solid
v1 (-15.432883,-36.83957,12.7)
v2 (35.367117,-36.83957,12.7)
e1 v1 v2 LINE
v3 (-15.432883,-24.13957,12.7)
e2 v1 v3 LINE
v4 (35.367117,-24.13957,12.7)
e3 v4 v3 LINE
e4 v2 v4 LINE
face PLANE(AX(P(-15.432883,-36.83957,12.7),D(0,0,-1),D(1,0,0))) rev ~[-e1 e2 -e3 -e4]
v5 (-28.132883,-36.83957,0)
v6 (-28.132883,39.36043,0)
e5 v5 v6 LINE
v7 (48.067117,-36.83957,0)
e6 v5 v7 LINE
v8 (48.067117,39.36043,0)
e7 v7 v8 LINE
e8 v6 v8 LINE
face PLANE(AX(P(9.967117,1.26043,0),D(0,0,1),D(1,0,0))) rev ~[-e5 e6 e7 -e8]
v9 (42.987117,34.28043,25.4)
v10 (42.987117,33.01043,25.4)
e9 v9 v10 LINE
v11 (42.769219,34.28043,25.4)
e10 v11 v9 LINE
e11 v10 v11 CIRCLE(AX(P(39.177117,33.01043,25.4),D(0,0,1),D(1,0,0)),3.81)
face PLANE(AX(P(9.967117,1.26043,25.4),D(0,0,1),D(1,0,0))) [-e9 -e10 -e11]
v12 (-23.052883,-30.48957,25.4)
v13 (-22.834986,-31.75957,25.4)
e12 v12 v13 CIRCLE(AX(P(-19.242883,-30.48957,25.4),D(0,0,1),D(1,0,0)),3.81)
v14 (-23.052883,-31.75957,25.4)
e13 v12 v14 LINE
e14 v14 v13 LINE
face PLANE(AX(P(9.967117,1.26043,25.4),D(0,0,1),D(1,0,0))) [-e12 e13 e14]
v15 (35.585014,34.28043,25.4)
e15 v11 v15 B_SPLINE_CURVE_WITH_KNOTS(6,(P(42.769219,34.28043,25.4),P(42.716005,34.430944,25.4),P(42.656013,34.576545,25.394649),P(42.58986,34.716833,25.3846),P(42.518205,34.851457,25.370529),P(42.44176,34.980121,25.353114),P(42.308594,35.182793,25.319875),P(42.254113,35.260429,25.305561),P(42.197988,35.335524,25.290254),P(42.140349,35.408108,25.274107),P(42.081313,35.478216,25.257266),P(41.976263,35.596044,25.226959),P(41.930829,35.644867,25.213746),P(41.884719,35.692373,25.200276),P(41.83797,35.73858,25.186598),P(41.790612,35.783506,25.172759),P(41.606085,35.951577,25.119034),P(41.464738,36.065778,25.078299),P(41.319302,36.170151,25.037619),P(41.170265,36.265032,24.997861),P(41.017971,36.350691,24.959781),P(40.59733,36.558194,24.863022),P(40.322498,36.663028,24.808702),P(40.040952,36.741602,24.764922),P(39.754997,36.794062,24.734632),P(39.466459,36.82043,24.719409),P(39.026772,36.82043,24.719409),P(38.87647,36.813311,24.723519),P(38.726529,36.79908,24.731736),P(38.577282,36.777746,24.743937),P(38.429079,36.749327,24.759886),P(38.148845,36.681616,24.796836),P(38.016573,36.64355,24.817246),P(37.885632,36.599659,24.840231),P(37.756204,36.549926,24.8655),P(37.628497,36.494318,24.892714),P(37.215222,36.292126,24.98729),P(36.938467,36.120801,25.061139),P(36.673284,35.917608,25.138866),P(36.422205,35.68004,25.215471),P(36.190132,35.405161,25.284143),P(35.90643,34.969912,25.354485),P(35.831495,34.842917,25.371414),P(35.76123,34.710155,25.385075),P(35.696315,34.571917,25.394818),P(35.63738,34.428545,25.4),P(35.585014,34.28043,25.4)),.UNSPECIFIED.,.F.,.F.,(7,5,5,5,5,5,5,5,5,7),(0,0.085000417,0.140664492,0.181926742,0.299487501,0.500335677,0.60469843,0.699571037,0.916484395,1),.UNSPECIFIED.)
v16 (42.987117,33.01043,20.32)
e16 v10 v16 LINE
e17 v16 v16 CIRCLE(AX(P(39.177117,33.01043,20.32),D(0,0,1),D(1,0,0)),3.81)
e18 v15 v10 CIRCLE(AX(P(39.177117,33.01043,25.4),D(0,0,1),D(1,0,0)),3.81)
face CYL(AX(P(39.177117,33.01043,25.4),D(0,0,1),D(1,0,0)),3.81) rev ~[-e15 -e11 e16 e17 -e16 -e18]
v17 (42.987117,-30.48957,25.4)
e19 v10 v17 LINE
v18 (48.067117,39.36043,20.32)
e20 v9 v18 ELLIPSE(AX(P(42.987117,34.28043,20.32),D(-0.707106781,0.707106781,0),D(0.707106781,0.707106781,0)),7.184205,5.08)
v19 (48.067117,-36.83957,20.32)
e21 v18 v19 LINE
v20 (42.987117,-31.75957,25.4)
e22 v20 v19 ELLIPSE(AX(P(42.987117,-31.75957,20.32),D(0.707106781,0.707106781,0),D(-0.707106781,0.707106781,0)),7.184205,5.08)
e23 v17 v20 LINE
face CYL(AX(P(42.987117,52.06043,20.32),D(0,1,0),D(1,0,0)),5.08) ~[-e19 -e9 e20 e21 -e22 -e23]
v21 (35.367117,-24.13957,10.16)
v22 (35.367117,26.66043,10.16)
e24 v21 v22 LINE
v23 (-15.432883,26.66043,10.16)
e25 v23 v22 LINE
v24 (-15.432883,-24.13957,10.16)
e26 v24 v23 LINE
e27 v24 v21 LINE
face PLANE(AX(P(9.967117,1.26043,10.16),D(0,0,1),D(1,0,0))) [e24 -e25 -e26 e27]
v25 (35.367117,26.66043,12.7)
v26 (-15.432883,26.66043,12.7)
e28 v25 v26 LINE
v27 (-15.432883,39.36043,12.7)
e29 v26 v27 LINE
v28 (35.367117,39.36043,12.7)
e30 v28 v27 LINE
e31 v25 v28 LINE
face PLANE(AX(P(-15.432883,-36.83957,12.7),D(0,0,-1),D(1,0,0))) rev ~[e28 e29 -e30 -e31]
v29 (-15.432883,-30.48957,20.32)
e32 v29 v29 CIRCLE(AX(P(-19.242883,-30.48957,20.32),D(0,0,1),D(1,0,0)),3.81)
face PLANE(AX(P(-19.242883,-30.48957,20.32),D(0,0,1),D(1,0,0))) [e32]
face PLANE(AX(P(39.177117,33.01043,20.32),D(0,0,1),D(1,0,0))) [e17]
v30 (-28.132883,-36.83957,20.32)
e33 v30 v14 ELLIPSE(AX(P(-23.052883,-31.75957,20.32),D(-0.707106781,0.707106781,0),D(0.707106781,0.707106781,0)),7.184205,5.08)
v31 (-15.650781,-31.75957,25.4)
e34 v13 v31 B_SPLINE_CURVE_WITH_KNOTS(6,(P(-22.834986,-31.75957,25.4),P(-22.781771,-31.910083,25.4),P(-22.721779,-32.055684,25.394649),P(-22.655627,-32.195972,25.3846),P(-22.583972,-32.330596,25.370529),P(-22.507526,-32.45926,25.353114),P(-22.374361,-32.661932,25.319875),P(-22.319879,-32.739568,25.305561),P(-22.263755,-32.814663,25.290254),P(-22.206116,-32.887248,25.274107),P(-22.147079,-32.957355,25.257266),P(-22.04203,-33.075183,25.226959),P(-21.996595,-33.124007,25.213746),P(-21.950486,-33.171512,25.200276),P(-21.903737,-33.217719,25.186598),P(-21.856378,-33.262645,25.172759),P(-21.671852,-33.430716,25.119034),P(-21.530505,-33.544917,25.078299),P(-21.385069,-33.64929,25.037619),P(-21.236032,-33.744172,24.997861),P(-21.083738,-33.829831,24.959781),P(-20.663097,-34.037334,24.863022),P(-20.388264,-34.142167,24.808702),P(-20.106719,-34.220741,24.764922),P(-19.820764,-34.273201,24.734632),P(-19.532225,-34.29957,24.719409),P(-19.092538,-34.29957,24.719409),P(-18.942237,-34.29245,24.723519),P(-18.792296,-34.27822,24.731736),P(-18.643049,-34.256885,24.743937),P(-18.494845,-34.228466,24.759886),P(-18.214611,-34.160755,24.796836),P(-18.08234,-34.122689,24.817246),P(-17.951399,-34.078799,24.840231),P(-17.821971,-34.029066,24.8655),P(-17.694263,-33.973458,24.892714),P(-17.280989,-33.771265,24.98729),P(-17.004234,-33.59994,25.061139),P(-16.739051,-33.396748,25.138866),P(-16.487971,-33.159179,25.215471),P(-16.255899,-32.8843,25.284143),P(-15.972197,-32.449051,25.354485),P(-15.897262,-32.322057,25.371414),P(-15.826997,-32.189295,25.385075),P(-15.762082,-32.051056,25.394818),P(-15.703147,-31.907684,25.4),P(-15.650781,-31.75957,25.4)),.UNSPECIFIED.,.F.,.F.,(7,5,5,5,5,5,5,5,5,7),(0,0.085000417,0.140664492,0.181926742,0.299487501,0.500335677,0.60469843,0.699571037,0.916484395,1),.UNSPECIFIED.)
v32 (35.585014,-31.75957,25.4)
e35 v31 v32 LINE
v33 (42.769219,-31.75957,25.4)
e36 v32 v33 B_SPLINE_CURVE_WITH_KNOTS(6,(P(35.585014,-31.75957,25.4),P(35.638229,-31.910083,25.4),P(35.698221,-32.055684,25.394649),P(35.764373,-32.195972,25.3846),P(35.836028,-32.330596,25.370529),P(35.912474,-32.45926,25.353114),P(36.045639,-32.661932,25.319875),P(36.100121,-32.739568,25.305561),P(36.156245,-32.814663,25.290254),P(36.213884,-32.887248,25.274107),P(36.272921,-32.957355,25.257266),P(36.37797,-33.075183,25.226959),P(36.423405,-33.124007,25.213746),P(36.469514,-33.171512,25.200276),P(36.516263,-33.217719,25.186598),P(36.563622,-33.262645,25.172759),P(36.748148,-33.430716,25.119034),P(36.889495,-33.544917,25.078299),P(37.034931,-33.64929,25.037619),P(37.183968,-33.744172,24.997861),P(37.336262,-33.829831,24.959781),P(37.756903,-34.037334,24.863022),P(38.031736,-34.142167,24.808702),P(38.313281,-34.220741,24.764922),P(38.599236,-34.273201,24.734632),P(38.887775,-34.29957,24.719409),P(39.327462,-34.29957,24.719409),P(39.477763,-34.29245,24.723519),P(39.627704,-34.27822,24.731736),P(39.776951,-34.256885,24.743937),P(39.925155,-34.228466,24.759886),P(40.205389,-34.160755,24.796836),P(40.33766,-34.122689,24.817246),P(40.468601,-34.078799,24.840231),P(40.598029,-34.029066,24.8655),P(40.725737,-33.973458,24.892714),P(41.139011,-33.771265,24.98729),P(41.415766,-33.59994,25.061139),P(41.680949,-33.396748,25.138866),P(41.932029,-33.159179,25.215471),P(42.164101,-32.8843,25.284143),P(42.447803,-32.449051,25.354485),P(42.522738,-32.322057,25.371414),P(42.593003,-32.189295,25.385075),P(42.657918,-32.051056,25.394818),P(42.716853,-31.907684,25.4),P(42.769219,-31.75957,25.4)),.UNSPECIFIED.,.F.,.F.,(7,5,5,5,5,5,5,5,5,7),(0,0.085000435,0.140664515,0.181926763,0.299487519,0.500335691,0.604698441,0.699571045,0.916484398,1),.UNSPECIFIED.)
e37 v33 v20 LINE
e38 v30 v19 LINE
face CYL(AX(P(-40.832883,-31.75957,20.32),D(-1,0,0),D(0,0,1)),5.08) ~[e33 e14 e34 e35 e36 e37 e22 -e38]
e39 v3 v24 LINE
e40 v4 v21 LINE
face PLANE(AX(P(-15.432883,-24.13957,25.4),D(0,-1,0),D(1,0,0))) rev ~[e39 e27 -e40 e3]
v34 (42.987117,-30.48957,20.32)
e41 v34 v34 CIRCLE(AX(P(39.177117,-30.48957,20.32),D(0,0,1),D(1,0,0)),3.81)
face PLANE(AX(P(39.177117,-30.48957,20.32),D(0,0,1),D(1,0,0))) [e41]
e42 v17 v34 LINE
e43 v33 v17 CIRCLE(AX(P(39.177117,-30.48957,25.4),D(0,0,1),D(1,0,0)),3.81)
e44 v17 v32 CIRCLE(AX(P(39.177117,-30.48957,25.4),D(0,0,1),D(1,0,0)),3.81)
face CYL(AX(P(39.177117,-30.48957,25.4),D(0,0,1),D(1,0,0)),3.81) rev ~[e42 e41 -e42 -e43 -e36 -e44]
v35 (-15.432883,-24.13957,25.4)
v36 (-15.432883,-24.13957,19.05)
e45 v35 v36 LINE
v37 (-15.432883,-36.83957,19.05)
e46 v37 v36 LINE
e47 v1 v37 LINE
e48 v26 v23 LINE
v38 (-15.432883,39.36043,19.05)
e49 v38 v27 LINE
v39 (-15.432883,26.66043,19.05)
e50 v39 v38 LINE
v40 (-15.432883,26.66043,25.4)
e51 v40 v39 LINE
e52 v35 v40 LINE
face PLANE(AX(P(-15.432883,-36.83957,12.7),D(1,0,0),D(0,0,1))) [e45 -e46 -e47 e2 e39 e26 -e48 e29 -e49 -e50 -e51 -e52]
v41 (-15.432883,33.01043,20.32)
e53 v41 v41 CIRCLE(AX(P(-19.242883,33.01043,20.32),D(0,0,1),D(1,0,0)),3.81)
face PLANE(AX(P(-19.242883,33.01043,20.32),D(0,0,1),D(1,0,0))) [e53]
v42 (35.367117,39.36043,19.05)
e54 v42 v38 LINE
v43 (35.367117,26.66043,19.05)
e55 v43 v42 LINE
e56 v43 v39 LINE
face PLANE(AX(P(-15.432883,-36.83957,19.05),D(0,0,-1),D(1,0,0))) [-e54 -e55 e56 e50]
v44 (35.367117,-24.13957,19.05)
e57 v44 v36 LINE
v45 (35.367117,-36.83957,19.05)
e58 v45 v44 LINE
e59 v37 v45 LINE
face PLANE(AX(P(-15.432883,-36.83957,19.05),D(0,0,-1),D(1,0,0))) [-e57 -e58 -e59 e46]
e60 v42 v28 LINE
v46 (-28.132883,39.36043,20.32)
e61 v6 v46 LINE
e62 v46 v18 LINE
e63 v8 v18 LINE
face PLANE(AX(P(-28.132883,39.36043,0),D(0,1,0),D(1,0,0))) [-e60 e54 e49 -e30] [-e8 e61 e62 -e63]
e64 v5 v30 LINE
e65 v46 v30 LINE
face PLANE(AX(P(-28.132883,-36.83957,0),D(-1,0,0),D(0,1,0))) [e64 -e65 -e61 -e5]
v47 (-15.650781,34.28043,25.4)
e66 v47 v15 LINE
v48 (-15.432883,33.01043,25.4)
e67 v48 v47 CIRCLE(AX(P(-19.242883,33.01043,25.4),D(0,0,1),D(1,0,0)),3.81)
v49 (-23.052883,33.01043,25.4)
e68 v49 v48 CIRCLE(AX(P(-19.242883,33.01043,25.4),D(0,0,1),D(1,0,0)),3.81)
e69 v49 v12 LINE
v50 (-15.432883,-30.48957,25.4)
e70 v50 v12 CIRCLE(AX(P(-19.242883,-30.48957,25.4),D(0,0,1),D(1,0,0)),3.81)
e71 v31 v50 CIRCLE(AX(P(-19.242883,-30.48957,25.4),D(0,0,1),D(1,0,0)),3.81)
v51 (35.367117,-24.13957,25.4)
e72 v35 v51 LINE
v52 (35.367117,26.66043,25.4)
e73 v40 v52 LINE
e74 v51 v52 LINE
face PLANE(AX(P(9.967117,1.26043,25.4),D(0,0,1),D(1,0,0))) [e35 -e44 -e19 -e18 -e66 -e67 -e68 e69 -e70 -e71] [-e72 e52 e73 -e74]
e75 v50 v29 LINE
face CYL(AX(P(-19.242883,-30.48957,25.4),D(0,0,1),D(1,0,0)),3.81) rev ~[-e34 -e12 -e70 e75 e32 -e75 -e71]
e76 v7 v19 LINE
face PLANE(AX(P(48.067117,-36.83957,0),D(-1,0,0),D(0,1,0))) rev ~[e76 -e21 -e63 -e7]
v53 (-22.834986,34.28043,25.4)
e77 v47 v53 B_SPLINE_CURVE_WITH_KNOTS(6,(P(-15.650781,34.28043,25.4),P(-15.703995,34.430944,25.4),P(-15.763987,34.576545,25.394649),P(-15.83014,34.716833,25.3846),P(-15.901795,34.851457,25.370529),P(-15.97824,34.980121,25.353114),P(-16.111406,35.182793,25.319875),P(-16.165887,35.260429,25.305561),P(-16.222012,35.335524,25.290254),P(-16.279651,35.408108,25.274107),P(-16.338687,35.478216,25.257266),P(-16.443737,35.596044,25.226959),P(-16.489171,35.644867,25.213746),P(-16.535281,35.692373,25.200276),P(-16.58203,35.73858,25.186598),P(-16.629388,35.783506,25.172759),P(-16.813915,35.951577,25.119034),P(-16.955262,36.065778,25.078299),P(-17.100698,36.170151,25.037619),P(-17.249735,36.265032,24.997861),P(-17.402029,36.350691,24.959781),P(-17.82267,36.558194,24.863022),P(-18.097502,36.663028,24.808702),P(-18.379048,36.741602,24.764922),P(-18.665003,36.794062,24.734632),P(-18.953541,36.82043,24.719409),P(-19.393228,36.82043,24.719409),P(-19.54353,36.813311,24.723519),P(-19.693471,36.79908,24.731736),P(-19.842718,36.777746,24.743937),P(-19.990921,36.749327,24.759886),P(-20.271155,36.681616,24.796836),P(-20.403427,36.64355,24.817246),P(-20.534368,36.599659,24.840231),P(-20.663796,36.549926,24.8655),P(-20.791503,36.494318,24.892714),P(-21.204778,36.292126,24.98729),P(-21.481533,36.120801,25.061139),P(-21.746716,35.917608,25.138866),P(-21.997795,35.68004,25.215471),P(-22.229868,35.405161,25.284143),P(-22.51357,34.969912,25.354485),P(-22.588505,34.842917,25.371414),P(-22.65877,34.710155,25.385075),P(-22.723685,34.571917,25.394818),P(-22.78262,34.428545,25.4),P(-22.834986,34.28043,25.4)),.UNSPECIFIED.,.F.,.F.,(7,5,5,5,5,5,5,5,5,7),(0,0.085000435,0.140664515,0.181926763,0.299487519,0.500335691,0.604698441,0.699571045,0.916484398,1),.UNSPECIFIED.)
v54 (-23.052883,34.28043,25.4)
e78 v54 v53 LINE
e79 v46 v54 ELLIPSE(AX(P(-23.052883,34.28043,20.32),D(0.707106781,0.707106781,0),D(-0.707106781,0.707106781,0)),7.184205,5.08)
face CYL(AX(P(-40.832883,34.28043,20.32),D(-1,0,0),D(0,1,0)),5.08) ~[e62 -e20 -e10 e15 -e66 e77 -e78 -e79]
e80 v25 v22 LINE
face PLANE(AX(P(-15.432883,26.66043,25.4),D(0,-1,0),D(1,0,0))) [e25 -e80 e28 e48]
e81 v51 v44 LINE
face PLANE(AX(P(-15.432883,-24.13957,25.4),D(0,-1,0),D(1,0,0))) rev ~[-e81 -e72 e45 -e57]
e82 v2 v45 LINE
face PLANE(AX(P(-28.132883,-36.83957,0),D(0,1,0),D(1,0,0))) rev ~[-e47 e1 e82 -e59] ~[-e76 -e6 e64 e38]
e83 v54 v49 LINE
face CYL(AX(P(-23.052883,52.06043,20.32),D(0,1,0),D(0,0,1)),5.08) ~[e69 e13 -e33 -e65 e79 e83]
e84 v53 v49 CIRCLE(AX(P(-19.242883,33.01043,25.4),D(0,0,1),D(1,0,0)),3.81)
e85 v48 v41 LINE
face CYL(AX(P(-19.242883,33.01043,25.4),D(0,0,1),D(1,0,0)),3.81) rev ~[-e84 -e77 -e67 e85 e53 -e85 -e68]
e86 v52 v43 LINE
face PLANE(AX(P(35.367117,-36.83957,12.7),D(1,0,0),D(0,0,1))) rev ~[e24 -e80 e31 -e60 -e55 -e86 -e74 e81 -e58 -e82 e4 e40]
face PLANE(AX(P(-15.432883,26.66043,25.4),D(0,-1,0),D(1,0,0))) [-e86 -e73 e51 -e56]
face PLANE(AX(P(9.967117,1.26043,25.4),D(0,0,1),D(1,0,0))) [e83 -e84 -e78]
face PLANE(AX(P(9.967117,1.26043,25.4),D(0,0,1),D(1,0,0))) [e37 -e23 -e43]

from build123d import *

# Parameters (mm, degrees)
F0_W        = 76.2
F0_H        = 76.2
F1_DEPTH    = 25.4
F2_W        = 50.8
F2_H        = 6.35
F3_DEPTH    = 76.201
F4_W        = 50.8
F4_H        = 50.8
F5_DEPTH    = 15.24
F6_R        = 3.81
F7_DEPTH    = 5.08
F8_T1_DEPTH = 101.6
F8_T3_DEPTH = 101.6


# Not quite as in the source:
# - a fillet or chamfer that OpenCascade refuses, or shapes differently, is made with other operations: its cross-section is extruded or revolved along the edge and cut away or added


with BuildPart() as f1:
    # F0 (on Top) → F1 (new body)
    with BuildSketch(Plane.XY):
        with Locations((9.967116639, 1.2604303423)):
            Rectangle(F0_W, F0_H)
    extrude(amount=F1_DEPTH)

    # F2 (on face) → F3 (cut, through all)
    with BuildSketch(Plane.XZ.offset(36.8395696577)):
        with Locations((9.967116639, 15.875)):
            Rectangle(F2_W, F2_H)
    extrude(amount=-F3_DEPTH, mode=Mode.SUBTRACT)

    # F4 (on face) → F5 (cut)
    with BuildSketch(Plane.XY.offset(25.4)):
        with Locations((9.967116639, 1.2604303423)):
            Rectangle(F4_W, F4_H)
    extrude(amount=-F5_DEPTH, mode=Mode.SUBTRACT)

    # F6 (on face) → F7 (cut)
    with BuildSketch(Plane.XY.offset(25.4)):
        with Locations((-19.242883361, 33.0104303423)):
            Circle(F6_R)
        with Locations((39.177116639, 33.0104303423)):
            Circle(F6_R)
        with Locations((-19.242883361, -30.4895696577)):
            Circle(F6_R)
        with Locations((39.177116639, -30.4895696577)):
            Circle(F6_R)
    extrude(amount=-F7_DEPTH, mode=Mode.SUBTRACT)

    # F8: fillet of radius 5.08 on 4 edges, made by hand

    # F8_s2 → F8_t1 (cut)
    with BuildSketch(Plane.XZ.offset(-52.0604303423)):
        with BuildLine():
            ThreePointArc((48.067116639, 20.32), (46.5792190874, 23.9121024484), (42.987116639, 25.4))
            Line((42.987116639, 25.4), (48.067116639, 25.4))
            Line((48.067116639, 25.4), (48.067116639, 20.32))
        make_face()
        with BuildLine():
            ThreePointArc((-23.052883361, 25.4), (-26.6449858094, 23.9121024484), (-28.132883361, 20.32))
            Line((-28.132883361, 20.32), (-28.132883361, 25.4))
            Line((-28.132883361, 25.4), (-23.052883361, 25.4))
        make_face()
    extrude(amount=F8_T1_DEPTH, mode=Mode.SUBTRACT)

    # F8_s4 → F8_t3 (cut)
    with BuildSketch(Plane.YZ.offset(-40.832883361)):
        with BuildLine():
            ThreePointArc((-31.7595696577, 25.4), (-35.3516721061, 23.9121024484), (-36.8395696577, 20.32))
            Line((-36.8395696577, 20.32), (-36.8395696577, 25.4))
            Line((-36.8395696577, 25.4), (-31.7595696577, 25.4))
        make_face()
        with BuildLine():
            ThreePointArc((39.3604303423, 20.32), (37.8725327907, 23.9121024484), (34.2804303423, 25.4))
            Line((34.2804303423, 25.4), (39.3604303423, 25.4))
            Line((39.3604303423, 25.4), (39.3604303423, 20.32))
        make_face()
    extrude(amount=F8_T3_DEPTH, mode=Mode.SUBTRACT)


solid = f1.part
